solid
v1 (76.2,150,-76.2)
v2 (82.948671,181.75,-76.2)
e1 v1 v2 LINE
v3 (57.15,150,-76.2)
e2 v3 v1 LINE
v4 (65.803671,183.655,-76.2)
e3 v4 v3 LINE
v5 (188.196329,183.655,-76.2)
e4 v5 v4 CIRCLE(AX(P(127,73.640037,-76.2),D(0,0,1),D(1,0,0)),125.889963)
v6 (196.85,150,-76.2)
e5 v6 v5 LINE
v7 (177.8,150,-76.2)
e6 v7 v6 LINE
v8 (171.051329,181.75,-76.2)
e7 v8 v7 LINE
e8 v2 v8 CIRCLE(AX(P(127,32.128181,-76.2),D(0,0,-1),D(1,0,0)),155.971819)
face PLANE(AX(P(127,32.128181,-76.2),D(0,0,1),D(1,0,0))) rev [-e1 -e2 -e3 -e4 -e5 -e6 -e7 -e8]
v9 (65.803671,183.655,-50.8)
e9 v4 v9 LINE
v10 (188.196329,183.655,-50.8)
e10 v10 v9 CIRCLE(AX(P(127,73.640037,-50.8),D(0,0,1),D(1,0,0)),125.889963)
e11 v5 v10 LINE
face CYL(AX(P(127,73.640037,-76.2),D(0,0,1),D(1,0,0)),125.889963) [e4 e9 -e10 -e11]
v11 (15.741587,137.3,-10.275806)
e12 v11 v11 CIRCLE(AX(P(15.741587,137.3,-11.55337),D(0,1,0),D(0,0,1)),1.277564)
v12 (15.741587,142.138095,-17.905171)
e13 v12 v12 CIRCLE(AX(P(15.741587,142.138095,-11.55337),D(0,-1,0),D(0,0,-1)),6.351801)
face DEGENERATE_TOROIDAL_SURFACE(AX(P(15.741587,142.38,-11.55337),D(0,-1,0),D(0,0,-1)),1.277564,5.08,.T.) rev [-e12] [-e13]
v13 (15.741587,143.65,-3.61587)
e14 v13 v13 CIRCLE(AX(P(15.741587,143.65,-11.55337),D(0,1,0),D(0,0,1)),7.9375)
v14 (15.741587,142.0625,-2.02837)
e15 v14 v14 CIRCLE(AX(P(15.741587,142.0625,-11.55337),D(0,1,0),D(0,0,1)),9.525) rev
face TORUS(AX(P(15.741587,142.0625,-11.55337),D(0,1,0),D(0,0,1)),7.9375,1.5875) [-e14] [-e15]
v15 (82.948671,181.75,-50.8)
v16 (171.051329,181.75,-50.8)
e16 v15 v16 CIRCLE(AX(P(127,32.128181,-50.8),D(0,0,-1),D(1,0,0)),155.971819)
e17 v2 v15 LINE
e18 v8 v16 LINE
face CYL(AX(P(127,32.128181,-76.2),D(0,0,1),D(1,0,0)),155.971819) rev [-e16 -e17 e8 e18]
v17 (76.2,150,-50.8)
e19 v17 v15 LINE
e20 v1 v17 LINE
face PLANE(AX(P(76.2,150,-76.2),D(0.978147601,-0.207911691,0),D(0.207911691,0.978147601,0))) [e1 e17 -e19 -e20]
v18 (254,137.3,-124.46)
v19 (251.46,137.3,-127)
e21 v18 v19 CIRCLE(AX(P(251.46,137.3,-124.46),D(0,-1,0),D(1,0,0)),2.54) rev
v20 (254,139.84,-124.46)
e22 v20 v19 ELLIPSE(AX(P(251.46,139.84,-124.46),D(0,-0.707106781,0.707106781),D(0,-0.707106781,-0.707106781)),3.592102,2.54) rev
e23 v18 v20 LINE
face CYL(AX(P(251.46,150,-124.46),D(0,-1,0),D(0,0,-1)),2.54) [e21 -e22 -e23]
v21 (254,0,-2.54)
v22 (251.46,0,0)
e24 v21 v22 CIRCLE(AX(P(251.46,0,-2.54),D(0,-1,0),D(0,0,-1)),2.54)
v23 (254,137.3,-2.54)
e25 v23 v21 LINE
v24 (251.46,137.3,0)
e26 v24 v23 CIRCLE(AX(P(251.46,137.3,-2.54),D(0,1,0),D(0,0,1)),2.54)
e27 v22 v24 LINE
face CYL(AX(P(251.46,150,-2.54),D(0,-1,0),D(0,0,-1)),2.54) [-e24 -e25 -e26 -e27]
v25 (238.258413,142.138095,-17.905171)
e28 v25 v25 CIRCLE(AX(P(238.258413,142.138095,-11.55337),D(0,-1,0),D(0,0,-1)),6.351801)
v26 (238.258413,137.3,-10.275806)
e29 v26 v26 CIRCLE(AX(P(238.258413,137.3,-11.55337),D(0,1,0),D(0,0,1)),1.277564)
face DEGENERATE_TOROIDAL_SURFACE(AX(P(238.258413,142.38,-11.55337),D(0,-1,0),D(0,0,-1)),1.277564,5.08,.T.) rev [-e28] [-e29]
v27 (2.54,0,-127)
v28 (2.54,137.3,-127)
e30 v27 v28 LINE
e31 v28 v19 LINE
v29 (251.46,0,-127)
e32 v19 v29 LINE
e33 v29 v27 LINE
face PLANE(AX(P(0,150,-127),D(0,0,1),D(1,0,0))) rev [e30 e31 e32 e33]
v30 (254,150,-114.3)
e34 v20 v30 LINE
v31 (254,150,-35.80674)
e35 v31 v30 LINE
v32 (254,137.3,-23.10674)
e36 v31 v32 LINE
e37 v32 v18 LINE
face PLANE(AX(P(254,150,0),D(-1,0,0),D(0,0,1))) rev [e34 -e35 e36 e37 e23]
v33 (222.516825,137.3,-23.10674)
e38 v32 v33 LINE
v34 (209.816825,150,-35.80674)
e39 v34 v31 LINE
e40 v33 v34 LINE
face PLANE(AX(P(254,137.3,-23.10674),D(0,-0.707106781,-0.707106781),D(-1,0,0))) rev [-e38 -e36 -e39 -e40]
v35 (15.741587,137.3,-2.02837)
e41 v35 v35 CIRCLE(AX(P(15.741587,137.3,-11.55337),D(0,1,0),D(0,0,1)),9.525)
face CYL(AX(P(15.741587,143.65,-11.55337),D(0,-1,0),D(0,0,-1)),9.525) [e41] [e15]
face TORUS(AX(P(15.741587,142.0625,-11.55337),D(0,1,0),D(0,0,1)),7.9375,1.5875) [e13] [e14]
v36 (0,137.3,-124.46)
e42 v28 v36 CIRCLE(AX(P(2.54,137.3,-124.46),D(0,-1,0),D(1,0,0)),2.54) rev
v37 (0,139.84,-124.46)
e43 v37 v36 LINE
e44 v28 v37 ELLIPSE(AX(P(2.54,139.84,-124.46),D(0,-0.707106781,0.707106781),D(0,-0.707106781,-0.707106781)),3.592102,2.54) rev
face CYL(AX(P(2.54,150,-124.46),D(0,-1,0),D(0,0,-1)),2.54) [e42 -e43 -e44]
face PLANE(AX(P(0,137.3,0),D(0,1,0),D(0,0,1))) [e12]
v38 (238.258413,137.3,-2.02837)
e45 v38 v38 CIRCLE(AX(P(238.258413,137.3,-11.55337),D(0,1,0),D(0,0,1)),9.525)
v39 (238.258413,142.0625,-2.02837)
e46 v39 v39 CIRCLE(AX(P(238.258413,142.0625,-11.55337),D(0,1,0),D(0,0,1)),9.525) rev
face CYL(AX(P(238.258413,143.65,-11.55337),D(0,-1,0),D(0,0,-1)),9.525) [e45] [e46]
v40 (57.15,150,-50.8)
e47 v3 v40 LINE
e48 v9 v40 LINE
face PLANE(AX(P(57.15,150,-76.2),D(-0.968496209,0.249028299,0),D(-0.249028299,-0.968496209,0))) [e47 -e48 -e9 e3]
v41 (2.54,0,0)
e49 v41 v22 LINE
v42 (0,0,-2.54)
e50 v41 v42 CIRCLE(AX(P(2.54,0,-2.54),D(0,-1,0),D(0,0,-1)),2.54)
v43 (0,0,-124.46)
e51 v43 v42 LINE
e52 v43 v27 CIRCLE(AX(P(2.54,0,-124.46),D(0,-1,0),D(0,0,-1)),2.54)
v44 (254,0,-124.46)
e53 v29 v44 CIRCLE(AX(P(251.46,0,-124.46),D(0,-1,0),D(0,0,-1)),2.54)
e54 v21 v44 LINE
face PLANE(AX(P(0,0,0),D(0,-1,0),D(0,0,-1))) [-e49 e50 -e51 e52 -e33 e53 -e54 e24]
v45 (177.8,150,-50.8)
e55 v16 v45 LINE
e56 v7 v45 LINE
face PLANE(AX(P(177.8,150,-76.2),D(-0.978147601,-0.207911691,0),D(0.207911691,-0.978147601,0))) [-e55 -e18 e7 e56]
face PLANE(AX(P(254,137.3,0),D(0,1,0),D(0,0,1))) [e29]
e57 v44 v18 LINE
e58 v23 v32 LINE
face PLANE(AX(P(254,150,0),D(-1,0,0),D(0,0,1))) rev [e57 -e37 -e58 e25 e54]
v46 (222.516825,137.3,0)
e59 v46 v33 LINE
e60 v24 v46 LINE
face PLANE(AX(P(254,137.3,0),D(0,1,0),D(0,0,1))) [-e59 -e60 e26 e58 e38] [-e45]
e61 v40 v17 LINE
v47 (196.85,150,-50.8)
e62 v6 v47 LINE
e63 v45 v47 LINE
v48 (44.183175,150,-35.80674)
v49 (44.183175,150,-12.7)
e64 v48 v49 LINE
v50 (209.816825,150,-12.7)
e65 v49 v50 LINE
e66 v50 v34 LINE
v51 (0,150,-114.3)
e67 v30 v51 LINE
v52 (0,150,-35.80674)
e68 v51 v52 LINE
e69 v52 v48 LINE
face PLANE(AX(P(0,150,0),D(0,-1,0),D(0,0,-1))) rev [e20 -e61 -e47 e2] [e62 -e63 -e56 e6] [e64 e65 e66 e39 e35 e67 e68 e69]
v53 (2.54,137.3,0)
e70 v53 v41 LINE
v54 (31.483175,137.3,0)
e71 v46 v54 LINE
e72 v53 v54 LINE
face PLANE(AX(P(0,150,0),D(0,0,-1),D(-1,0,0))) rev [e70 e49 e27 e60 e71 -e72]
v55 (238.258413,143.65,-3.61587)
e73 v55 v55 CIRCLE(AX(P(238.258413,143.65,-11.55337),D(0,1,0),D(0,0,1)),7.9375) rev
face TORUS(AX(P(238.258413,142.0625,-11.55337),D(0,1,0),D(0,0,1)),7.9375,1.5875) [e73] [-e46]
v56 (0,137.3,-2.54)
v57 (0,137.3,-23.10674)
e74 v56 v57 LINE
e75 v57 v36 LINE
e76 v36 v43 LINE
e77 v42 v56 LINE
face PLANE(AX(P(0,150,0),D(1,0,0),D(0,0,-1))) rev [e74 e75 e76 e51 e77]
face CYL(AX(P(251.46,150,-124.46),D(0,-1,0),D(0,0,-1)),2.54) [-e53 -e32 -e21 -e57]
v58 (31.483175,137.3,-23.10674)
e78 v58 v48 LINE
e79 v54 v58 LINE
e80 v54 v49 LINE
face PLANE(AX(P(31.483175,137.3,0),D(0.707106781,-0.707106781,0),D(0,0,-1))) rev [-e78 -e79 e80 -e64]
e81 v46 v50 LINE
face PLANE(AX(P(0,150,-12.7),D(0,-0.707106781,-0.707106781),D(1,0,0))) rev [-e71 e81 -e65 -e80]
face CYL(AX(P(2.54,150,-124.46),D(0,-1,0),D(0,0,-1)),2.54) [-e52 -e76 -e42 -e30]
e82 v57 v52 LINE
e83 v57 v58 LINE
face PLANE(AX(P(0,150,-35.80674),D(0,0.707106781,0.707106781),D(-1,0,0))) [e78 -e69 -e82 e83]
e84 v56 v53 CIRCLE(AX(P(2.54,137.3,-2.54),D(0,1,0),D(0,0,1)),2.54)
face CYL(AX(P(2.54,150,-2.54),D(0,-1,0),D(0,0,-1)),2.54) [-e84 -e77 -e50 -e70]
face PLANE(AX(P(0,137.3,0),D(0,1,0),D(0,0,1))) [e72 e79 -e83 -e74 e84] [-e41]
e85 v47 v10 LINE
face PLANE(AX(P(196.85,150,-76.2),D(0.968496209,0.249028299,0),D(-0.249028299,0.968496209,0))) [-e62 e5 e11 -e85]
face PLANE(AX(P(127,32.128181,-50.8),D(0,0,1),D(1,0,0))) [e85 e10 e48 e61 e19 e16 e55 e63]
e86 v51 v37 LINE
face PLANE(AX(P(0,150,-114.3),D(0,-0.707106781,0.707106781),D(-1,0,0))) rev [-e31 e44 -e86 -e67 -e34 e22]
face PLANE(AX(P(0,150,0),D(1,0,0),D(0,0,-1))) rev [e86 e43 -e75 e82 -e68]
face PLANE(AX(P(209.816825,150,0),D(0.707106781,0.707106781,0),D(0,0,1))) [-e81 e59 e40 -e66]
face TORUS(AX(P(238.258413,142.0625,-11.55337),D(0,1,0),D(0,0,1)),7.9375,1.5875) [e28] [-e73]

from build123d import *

# Parameters (mm, degrees)
SKETCH1_W            = 254
SKETCH1_H            = 127
BOSS_EXTRUDE1_DEPTH  = 150
SKETCH2_W            = 31.483174514
SKETCH2_H            = 23.106740065
CUT_EXTRUDE1_DEPTH   = 12.7
SKETCH3_R            = 9.525
SKETCH3_R_2          = 6.35
BOSS_EXTRUDE2_DEPTH  = 6.35
FILLET1_R            = 1.5875
FILLET1_OF_MIRROR1_R = 1.5875
CHAMFER1_SIZE        = 12.7
FILLET2_R            = 5.08
FILLET3_R            = 2.54
BOSS_EXTRUDE3_START  = -50.8
BOSS_EXTRUDE3_DEPTH  = 25.4


with BuildPart() as part:
    # Sketch1 → Boss-Extrude1 (new body)
    with BuildSketch(Plane(origin=(0, 0, 0), x_dir=(1, 0, 0), z_dir=(0, 1, 0))):
        with Locations((127, 63.5)):
            Rectangle(SKETCH1_W, SKETCH1_H)
    extrude(amount=BOSS_EXTRUDE1_DEPTH)

    # Sketch2 → Cut-Extrude1 (cut)
    with BuildSketch(Plane(origin=(0, 150, 0), x_dir=(1, 0, 0), z_dir=(0, 1, 0))):
        with Locations((15.741587257, 11.553370033)):
            Rectangle(SKETCH2_W, SKETCH2_H)
    cut_extrude1 = extrude(amount=-CUT_EXTRUDE1_DEPTH, mode=Mode.SUBTRACT)

    # Sketch3 → Boss-Extrude2 (add)
    with BuildSketch(Plane(origin=(0, 137.3, 0), x_dir=(1, 0, 0), z_dir=(0, 1, 0))):
        with Locations(Location((15.741587257, 11.553370033, 0), (0, 0, 270))):
            Circle(SKETCH3_R)
        with Locations(Location((15.741587257, 11.553370033, 0), (0, 0, 270))):
            Circle(SKETCH3_R_2, mode=Mode.SUBTRACT)
    boss_extrude2 = extrude(amount=BOSS_EXTRUDE2_DEPTH)

    # Fillet1
    fillet1_edges = [part.edges().sort_by_distance(p)[0] for p in [
        (15.741587257, 143.65, -21.078370033),
        (15.741587257, 143.65, -17.903370033),
    ]]
    fillet(fillet1_edges, radius=FILLET1_R - 0.0001)  # a hair under: the kernel refuses the full size

    # Mirror1: Cut-Extrude1, Boss-Extrude2 across plane
    add(cut_extrude1.mirror(Plane(origin=(127, 0, 0), x_dir=(0, 0, 1), z_dir=(1, 0, 0))), mode=Mode.SUBTRACT)
    add(boss_extrude2.mirror(Plane(origin=(127, 0, 0), x_dir=(0, 0, 1), z_dir=(1, 0, 0))))

    # Fillet1 of Mirror1
    fillet1_of_mirror1_edges = [part.edges().sort_by_distance(p)[0] for p in [
        (238.258412743, 143.65, -21.078370033),
        (238.258412743, 143.65, -17.903370033),
    ]]
    fillet(fillet1_of_mirror1_edges, radius=FILLET1_OF_MIRROR1_R - 0.0001)  # a hair under: the kernel refuses the full size

    # Chamfer1
    chamfer1_edges = [part.edges().sort_by_distance(p)[0] for p in [
        (31.483174514, 150, -11.553370033),
        (15.741587257, 150, -23.106740065),
        (127, 150, -127),
        (238.258412743, 150, -23.106740065),
        (222.516825486, 150, -11.553370033),
        (127, 150, 0),
    ]]
    chamfer(chamfer1_edges, length=CHAMFER1_SIZE - 0.0001)  # a hair under: the kernel refuses the full size

    # Fillet2
    fillet2_edges = [part.edges().sort_by_distance(p)[0] for p in [
        (238.258412743, 137.3, -17.903370033),
        (15.741587257, 137.3, -17.903370033),
    ]]
    fillet(fillet2_edges, radius=FILLET2_R)

    # Fillet3
    fillet3_edges = [part.edges().sort_by_distance(p)[0] for p in [
        (0, 68.65, 0),
        (254, 68.65, 0),
        (0, 68.65005, -127),
        (254, 68.65005, -127),
    ]]
    fillet(fillet3_edges, radius=FILLET3_R)

    # Sketch4 → Boss-Extrude3 (add)
    with BuildSketch(Plane.XY.offset(BOSS_EXTRUDE3_START)):
        with BuildLine():
            Line((177.8, 150), (196.85, 150))
            Line((196.85, 150), (188.196329167, 183.655))
            ThreePointArc((188.196329167, 183.655), (127, 199.53), (65.803670833, 183.655))
            Line((65.803670833, 183.655), (57.15, 150))
            Line((57.15, 150), (76.2, 150))
            Line((76.2, 150), (82.948670833, 181.75))
            ThreePointArc((82.948670833, 181.75), (127, 188.1), (171.051329167, 181.75))
            Line((171.051329167, 181.75), (177.8, 150))
        make_face()
    extrude(amount=-BOSS_EXTRUDE3_DEPTH)


solid = part.part
